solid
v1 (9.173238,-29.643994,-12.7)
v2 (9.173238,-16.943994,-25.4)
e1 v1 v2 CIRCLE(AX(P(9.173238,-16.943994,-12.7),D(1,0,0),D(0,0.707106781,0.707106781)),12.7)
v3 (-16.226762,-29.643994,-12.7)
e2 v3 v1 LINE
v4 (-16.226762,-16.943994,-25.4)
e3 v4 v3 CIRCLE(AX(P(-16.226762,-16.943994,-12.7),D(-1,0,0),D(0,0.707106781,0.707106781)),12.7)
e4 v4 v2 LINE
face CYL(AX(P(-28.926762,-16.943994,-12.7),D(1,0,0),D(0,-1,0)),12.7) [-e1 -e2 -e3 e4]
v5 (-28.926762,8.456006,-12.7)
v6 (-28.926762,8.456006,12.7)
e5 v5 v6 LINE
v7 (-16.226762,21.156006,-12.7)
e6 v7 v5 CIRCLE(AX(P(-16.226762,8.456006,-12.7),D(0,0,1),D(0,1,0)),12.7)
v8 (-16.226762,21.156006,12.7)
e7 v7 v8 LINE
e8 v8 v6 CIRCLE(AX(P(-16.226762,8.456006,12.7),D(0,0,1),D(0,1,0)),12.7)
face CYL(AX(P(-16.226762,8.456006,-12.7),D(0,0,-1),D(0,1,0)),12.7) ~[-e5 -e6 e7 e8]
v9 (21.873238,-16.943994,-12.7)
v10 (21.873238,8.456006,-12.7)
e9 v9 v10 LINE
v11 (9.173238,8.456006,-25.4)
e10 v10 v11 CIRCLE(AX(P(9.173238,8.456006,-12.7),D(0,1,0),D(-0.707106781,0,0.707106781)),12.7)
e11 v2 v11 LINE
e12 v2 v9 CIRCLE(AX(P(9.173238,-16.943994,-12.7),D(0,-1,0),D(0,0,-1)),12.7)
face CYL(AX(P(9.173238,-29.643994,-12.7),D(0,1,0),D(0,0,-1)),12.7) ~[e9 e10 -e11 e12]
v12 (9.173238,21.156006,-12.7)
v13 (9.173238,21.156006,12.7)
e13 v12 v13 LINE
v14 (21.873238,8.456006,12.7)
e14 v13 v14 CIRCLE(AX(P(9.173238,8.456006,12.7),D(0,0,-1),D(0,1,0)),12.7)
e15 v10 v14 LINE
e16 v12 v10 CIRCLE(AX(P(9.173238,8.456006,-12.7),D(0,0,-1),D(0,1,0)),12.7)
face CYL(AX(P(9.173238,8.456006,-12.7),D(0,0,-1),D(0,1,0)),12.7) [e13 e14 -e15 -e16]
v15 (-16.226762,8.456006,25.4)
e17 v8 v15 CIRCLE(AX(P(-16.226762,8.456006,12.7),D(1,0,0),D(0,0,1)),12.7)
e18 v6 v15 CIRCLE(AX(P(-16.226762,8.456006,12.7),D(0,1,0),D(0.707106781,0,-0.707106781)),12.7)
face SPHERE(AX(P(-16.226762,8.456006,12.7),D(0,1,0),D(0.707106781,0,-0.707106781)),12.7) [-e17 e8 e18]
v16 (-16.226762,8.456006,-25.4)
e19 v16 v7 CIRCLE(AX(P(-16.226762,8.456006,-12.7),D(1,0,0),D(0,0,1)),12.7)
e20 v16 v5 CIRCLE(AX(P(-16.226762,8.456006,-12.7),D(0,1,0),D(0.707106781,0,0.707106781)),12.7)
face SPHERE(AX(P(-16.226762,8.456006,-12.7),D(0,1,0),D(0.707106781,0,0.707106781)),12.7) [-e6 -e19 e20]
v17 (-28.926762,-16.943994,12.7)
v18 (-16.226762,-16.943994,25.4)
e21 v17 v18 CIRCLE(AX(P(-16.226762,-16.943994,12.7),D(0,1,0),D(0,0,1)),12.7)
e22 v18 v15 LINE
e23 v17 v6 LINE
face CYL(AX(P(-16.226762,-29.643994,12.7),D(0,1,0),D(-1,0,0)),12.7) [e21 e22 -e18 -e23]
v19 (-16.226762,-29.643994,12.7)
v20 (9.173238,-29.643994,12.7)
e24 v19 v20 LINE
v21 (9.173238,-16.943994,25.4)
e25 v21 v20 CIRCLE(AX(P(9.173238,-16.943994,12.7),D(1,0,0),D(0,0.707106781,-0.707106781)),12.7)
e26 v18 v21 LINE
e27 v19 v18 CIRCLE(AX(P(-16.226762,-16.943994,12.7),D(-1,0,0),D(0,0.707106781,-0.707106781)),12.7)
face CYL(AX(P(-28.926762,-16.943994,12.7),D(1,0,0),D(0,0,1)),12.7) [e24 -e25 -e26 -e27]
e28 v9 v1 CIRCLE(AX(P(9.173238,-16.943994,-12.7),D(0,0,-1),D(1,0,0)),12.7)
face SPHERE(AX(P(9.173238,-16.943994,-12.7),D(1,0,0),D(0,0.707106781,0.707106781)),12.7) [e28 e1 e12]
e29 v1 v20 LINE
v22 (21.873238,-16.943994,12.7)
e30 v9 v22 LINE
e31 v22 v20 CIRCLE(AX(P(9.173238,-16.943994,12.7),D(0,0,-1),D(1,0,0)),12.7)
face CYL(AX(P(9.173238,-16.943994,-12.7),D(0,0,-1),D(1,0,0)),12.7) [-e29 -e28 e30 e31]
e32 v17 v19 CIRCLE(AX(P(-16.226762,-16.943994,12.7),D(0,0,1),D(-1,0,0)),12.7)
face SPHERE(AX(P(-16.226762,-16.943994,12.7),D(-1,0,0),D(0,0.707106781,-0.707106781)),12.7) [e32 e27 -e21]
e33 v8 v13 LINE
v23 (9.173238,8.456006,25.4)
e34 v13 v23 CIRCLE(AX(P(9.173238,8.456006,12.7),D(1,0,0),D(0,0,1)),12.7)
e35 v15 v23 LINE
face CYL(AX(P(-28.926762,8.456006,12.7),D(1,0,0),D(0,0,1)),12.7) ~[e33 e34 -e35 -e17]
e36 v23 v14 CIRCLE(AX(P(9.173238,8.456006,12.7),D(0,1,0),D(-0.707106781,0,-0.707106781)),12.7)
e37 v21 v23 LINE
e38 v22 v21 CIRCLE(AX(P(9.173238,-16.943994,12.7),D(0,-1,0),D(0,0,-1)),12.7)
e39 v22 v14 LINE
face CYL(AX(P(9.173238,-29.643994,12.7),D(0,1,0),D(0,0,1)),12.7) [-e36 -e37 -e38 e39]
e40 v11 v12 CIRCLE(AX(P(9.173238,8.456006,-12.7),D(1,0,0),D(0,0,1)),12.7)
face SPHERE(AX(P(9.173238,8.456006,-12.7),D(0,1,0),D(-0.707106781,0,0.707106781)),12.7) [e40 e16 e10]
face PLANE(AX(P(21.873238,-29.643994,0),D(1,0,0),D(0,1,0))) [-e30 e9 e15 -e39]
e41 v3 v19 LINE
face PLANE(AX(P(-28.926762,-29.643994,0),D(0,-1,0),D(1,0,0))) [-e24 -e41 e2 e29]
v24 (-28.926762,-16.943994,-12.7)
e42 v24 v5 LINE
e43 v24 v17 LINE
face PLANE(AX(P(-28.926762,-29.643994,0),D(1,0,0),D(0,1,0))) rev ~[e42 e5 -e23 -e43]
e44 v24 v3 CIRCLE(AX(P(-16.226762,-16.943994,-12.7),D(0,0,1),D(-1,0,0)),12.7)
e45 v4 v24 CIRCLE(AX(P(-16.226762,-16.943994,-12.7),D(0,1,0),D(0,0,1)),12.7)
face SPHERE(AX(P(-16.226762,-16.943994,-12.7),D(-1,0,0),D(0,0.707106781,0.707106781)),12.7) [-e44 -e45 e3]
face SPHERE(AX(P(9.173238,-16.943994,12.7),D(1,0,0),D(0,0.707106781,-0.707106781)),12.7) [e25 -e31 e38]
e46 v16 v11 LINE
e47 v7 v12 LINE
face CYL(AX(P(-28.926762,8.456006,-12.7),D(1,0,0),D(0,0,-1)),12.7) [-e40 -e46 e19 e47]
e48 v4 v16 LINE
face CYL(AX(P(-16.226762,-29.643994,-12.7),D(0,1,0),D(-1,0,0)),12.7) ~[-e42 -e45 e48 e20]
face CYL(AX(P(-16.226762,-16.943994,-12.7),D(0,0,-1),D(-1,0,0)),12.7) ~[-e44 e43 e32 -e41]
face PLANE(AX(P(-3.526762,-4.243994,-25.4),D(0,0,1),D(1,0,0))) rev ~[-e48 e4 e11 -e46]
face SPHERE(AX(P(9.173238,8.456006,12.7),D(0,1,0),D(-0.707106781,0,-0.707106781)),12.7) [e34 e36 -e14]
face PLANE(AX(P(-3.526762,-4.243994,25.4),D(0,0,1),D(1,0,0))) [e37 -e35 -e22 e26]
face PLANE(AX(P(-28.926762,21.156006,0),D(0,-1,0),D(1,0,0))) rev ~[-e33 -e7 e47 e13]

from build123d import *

# Parameters (mm, degrees)
F0_W         = 50.8
F0_H         = 50.8
F1_DEPTH     = 25.4
F2_DEPTH     = 25.4
F3_R         = 12.7
F4_R         = 12.7
F5_T1_DEPTH  = 25.4
F5_S5_W      = 12.7
F5_S5_H      = 12.7
F5_T6_DEPTH  = 12.7
F5_S11_W     = 12.7
F5_S11_H     = 12.7
F5_T12_DEPTH = 12.7
F5_S17_W     = 12.7
F5_S17_H     = 12.7
F5_T18_DEPTH = 12.7
F5_S23_W     = 12.7
F5_S23_H     = 12.7
F5_T24_DEPTH = 12.7
F5_S29_W     = 12.7
F5_S29_H     = 12.7
F5_T30_DEPTH = 12.7
F5_S35_W     = 12.7
F5_S35_H     = 12.7
F5_T36_DEPTH = 12.7
F5_S41_W     = 12.7
F5_S41_H     = 12.7
F5_T42_DEPTH = 12.7
F5_S47_W     = 12.7
F5_S47_H     = 12.7
F5_T48_DEPTH = 12.7


# Not quite as in the source:
# - a fillet or chamfer that OpenCascade refuses, or shapes differently, is made with other operations: its cross-section is extruded or revolved along the edge and cut away or added


with BuildPart() as f1:
    # F0 (on Top) → F1 (new body)
    with BuildSketch(Plane.XY):
        with Locations((-3.5267624348, -4.2439938247)):
            Rectangle(F0_W, F0_H)
    extrude(amount=F1_DEPTH)

    # F2 (add): a face of the model
    f2_faces = [f1.faces().sort_by_distance(p)[0] for p in [
        (-3.5267624348, -4.2439938247, 0),
    ]]
    extrude(f2_faces, amount=F2_DEPTH)

    # F3
    f3_edges = [f1.edges().sort_by_distance(p)[0] for p in [
        (-3.526762, -29.643994, 25.4),
        (-28.926762, -4.243994, 25.4),
        (-3.526762, 21.156006, 25.4),
        (21.873238, -4.243994, 25.4),
    ]]
    fillet(f3_edges, radius=F3_R)

    # F4
    f4_edges = [f1.edges().sort_by_distance(p)[0] for p in [
        (-3.526762, -29.643994, -25.4),
        (-28.926762, -4.243994, -25.4),
        (-3.526762, 21.156006, -25.4),
        (21.873238, -4.243994, -25.4),
    ]]
    fillet(f4_edges, radius=F4_R)

    # F5: fillet of radius 12.7 on 4 edges, made by hand

    # F5_s2 → F5_t1 (cut)
    with BuildSketch(Plane.XY.offset(-12.7)):
        with BuildLine():
            ThreePointArc((-28.9267624348, -16.9439938247), (-25.2070185559, -25.9242499458), (-16.2267624348, -29.6439938247))
            Line((-16.2267624348, -29.6439938247), (-28.9267624348, -29.6439938247))
            Line((-28.9267624348, -29.6439938247), (-28.9267624348, -16.9439938247))
        make_face()
        with BuildLine():
            ThreePointArc((-16.2267624348, 21.1560061753), (-25.2070185559, 17.4362622963), (-28.9267624348, 8.4560061753))
            Line((-28.9267624348, 8.4560061753), (-28.9267624348, 21.1560061753))
            Line((-28.9267624348, 21.1560061753), (-16.2267624348, 21.1560061753))
        make_face()
        with BuildLine():
            ThreePointArc((9.1732375652, 21.1560061753), (18.1534936862, 17.4362622963), (21.8732375652, 8.4560061753))
            Line((21.8732375652, 8.4560061753), (21.8732375652, 21.1560061753))
            Line((21.8732375652, 21.1560061753), (9.1732375652, 21.1560061753))
        make_face()
        with BuildLine():
            ThreePointArc((21.8732375652, -16.9439938247), (18.1534936862, -25.9242499458), (9.1732375652, -29.6439938247))
            Line((9.1732375652, -29.6439938247), (21.8732375652, -29.6439938247))
            Line((21.8732375652, -29.6439938247), (21.8732375652, -16.9439938247))
        make_face()
    extrude(amount=F5_T1_DEPTH, mode=Mode.SUBTRACT)


with BuildPart() as f5_tool4:
    # F5_s5 → F5_t6 (new body)
    with BuildSketch(Plane.YZ.offset(9.1732375652)):
        with Locations((-23.2939938247, 19.05)):
            Rectangle(F5_S5_W, F5_S5_H)
    extrude(amount=F5_T6_DEPTH)

    # F5_s7 → F5_t8 (revolve, cut)
    with BuildSketch(Plane(origin=(9.1732375652, -16.9439938247, 12.7), x_dir=(0, 0.7071067812, -0.7071067812), z_dir=(0, -0.7071067812, -0.7071067812))):
        with BuildLine():
            ThreePointArc((0, -12.7), (12.7, 0), (0, 12.7))
            Line((0, 12.7), (0, -12.7))
        make_face()
    revolve(axis=Axis((9.1732375652, -16.9439938247, 12.7), (1, 0, 0)), mode=Mode.SUBTRACT)


with BuildPart() as f1_1:
    add(f1.part)

    # F5_t3: cut F5_tool4
    add(f5_tool4.part, mode=Mode.SUBTRACT)


with BuildPart() as f5_tool10:
    # F5_s11 → F5_t12 (new body)
    with BuildSketch(Plane.YZ.offset(9.1732375652)):
        with Locations((-23.2939938247, -19.05)):
            Rectangle(F5_S11_W, F5_S11_H)
    extrude(amount=F5_T12_DEPTH)

    # F5_s13 → F5_t14 (revolve, cut)
    with BuildSketch(Plane(origin=(9.1732375652, -16.9439938247, -12.7), x_dir=(0, 0.7071067812, 0.7071067812), z_dir=(0, 0.7071067812, -0.7071067812))):
        with BuildLine():
            ThreePointArc((0, -12.7), (12.7, 0), (0, 12.7))
            Line((0, 12.7), (0, -12.7))
        make_face()
    revolve(axis=Axis((9.1732375652, -16.9439938247, -12.7), (1, 0, 0)), mode=Mode.SUBTRACT)


with BuildPart() as f1_2:
    add(f1_1.part)

    # F5_t9: cut F5_tool10
    add(f5_tool10.part, mode=Mode.SUBTRACT)


with BuildPart() as f5_tool16:
    # F5_s17 → F5_t18 (new body)
    with BuildSketch(Plane.XZ.offset(-8.4560061753)):
        with Locations((15.5232375652, 19.05)):
            Rectangle(F5_S17_W, F5_S17_H)
    extrude(amount=-F5_T18_DEPTH)

    # F5_s19 → F5_t20 (revolve, cut)
    with BuildSketch(Plane(origin=(9.1732375652, 8.4560061753, 12.7), x_dir=(-0.7071067812, 0, -0.7071067812), z_dir=(0.7071067812, 0, -0.7071067812))):
        with BuildLine():
            ThreePointArc((0, -12.7), (12.7, 0), (0, 12.7))
            Line((0, 12.7), (0, -12.7))
        make_face()
    revolve(axis=Axis((9.1732375652, 8.4560061753, 12.7), (0, 1, 0)), mode=Mode.SUBTRACT)


with BuildPart() as f1_3:
    add(f1_2.part)

    # F5_t15: cut F5_tool16
    add(f5_tool16.part, mode=Mode.SUBTRACT)


with BuildPart() as f5_tool22:
    # F5_s23 → F5_t24 (new body)
    with BuildSketch(Plane.XZ.offset(-8.4560061753)):
        with Locations((15.5232375652, -19.05)):
            Rectangle(F5_S23_W, F5_S23_H)
    extrude(amount=-F5_T24_DEPTH)

    # F5_s25 → F5_t26 (revolve, cut)
    with BuildSketch(Plane(origin=(9.1732375652, 8.4560061753, -12.7), x_dir=(-0.7071067812, 0, 0.7071067812), z_dir=(-0.7071067812, 0, -0.7071067812))):
        with BuildLine():
            ThreePointArc((0, -12.7), (12.7, 0), (0, 12.7))
            Line((0, 12.7), (0, -12.7))
        make_face()
    revolve(axis=Axis((9.1732375652, 8.4560061753, -12.7), (0, 1, 0)), mode=Mode.SUBTRACT)


with BuildPart() as f1_4:
    add(f1_3.part)

    # F5_t21: cut F5_tool22
    add(f5_tool22.part, mode=Mode.SUBTRACT)


with BuildPart() as f5_tool28:
    # F5_s29 → F5_t30 (new body)
    with BuildSketch(Plane.XZ.offset(-8.4560061753)):
        with Locations((-22.5767624348, -19.05)):
            Rectangle(F5_S29_W, F5_S29_H)
    extrude(amount=-F5_T30_DEPTH)

    # F5_s31 → F5_t32 (revolve, cut)
    with BuildSketch(Plane(origin=(-16.2267624348, 8.4560061753, -12.7), x_dir=(0.7071067812, 0, 0.7071067812), z_dir=(-0.7071067812, 0, 0.7071067812))):
        with BuildLine():
            ThreePointArc((0, -12.7), (12.7, 0), (0, 12.7))
            Line((0, 12.7), (0, -12.7))
        make_face()
    revolve(axis=Axis((-16.2267624348, 8.4560061753, -12.7), (0, 1, 0)), mode=Mode.SUBTRACT)


with BuildPart() as f1_5:
    add(f1_4.part)

    # F5_t27: cut F5_tool28
    add(f5_tool28.part, mode=Mode.SUBTRACT)


with BuildPart() as f5_tool34:
    # F5_s35 → F5_t36 (new body)
    with BuildSketch(Plane.XZ.offset(-8.4560061753)):
        with Locations((-22.5767624348, 19.05)):
            Rectangle(F5_S35_W, F5_S35_H)
    extrude(amount=-F5_T36_DEPTH)

    # F5_s37 → F5_t38 (revolve, cut)
    with BuildSketch(Plane(origin=(-16.2267624348, 8.4560061753, 12.7), x_dir=(0.7071067812, 0, -0.7071067812), z_dir=(0.7071067812, 0, 0.7071067812))):
        with BuildLine():
            ThreePointArc((0, -12.7), (12.7, 0), (0, 12.7))
            Line((0, 12.7), (0, -12.7))
        make_face()
    revolve(axis=Axis((-16.2267624348, 8.4560061753, 12.7), (0, 1, 0)), mode=Mode.SUBTRACT)


with BuildPart() as f1_6:
    add(f1_5.part)

    # F5_t33: cut F5_tool34
    add(f5_tool34.part, mode=Mode.SUBTRACT)


with BuildPart() as f5_tool40:
    # F5_s41 → F5_t42 (new body)
    with BuildSketch(Plane.YZ.offset(-16.2267624348)):
        with Locations((-23.2939938247, -19.05)):
            Rectangle(F5_S41_W, F5_S41_H)
    extrude(amount=-F5_T42_DEPTH)

    # F5_s43 → F5_t44 (revolve, cut)
    with BuildSketch(Plane(origin=(-16.2267624348, -16.9439938247, -12.7), x_dir=(0, 0.7071067812, 0.7071067812), z_dir=(0, -0.7071067812, 0.7071067812))):
        with BuildLine():
            ThreePointArc((0, -12.7), (12.7, 0), (0, 12.7))
            Line((0, 12.7), (0, -12.7))
        make_face()
    revolve(axis=Axis((-16.2267624348, -16.9439938247, -12.7), (-1, 0, 0)), mode=Mode.SUBTRACT)


with BuildPart() as f1_7:
    add(f1_6.part)

    # F5_t39: cut F5_tool40
    add(f5_tool40.part, mode=Mode.SUBTRACT)


with BuildPart() as f5_tool46:
    # F5_s47 → F5_t48 (new body)
    with BuildSketch(Plane.YZ.offset(-16.2267624348)):
        with Locations((-23.2939938247, 19.05)):
            Rectangle(F5_S47_W, F5_S47_H)
    extrude(amount=-F5_T48_DEPTH)

    # F5_s49 → F5_t50 (revolve, cut)
    with BuildSketch(Plane(origin=(-16.2267624348, -16.9439938247, 12.7), x_dir=(0, 0.7071067812, -0.7071067812), z_dir=(0, 0.7071067812, 0.7071067812))):
        with BuildLine():
            ThreePointArc((0, -12.7), (12.7, 0), (0, 12.7))
            Line((0, 12.7), (0, -12.7))
        make_face()
    revolve(axis=Axis((-16.2267624348, -16.9439938247, 12.7), (-1, 0, 0)), mode=Mode.SUBTRACT)


with BuildPart() as f1_8:
    add(f1_7.part)

    # F5_t45: cut F5_tool46
    add(f5_tool46.part, mode=Mode.SUBTRACT)


solid = f1_8.part
